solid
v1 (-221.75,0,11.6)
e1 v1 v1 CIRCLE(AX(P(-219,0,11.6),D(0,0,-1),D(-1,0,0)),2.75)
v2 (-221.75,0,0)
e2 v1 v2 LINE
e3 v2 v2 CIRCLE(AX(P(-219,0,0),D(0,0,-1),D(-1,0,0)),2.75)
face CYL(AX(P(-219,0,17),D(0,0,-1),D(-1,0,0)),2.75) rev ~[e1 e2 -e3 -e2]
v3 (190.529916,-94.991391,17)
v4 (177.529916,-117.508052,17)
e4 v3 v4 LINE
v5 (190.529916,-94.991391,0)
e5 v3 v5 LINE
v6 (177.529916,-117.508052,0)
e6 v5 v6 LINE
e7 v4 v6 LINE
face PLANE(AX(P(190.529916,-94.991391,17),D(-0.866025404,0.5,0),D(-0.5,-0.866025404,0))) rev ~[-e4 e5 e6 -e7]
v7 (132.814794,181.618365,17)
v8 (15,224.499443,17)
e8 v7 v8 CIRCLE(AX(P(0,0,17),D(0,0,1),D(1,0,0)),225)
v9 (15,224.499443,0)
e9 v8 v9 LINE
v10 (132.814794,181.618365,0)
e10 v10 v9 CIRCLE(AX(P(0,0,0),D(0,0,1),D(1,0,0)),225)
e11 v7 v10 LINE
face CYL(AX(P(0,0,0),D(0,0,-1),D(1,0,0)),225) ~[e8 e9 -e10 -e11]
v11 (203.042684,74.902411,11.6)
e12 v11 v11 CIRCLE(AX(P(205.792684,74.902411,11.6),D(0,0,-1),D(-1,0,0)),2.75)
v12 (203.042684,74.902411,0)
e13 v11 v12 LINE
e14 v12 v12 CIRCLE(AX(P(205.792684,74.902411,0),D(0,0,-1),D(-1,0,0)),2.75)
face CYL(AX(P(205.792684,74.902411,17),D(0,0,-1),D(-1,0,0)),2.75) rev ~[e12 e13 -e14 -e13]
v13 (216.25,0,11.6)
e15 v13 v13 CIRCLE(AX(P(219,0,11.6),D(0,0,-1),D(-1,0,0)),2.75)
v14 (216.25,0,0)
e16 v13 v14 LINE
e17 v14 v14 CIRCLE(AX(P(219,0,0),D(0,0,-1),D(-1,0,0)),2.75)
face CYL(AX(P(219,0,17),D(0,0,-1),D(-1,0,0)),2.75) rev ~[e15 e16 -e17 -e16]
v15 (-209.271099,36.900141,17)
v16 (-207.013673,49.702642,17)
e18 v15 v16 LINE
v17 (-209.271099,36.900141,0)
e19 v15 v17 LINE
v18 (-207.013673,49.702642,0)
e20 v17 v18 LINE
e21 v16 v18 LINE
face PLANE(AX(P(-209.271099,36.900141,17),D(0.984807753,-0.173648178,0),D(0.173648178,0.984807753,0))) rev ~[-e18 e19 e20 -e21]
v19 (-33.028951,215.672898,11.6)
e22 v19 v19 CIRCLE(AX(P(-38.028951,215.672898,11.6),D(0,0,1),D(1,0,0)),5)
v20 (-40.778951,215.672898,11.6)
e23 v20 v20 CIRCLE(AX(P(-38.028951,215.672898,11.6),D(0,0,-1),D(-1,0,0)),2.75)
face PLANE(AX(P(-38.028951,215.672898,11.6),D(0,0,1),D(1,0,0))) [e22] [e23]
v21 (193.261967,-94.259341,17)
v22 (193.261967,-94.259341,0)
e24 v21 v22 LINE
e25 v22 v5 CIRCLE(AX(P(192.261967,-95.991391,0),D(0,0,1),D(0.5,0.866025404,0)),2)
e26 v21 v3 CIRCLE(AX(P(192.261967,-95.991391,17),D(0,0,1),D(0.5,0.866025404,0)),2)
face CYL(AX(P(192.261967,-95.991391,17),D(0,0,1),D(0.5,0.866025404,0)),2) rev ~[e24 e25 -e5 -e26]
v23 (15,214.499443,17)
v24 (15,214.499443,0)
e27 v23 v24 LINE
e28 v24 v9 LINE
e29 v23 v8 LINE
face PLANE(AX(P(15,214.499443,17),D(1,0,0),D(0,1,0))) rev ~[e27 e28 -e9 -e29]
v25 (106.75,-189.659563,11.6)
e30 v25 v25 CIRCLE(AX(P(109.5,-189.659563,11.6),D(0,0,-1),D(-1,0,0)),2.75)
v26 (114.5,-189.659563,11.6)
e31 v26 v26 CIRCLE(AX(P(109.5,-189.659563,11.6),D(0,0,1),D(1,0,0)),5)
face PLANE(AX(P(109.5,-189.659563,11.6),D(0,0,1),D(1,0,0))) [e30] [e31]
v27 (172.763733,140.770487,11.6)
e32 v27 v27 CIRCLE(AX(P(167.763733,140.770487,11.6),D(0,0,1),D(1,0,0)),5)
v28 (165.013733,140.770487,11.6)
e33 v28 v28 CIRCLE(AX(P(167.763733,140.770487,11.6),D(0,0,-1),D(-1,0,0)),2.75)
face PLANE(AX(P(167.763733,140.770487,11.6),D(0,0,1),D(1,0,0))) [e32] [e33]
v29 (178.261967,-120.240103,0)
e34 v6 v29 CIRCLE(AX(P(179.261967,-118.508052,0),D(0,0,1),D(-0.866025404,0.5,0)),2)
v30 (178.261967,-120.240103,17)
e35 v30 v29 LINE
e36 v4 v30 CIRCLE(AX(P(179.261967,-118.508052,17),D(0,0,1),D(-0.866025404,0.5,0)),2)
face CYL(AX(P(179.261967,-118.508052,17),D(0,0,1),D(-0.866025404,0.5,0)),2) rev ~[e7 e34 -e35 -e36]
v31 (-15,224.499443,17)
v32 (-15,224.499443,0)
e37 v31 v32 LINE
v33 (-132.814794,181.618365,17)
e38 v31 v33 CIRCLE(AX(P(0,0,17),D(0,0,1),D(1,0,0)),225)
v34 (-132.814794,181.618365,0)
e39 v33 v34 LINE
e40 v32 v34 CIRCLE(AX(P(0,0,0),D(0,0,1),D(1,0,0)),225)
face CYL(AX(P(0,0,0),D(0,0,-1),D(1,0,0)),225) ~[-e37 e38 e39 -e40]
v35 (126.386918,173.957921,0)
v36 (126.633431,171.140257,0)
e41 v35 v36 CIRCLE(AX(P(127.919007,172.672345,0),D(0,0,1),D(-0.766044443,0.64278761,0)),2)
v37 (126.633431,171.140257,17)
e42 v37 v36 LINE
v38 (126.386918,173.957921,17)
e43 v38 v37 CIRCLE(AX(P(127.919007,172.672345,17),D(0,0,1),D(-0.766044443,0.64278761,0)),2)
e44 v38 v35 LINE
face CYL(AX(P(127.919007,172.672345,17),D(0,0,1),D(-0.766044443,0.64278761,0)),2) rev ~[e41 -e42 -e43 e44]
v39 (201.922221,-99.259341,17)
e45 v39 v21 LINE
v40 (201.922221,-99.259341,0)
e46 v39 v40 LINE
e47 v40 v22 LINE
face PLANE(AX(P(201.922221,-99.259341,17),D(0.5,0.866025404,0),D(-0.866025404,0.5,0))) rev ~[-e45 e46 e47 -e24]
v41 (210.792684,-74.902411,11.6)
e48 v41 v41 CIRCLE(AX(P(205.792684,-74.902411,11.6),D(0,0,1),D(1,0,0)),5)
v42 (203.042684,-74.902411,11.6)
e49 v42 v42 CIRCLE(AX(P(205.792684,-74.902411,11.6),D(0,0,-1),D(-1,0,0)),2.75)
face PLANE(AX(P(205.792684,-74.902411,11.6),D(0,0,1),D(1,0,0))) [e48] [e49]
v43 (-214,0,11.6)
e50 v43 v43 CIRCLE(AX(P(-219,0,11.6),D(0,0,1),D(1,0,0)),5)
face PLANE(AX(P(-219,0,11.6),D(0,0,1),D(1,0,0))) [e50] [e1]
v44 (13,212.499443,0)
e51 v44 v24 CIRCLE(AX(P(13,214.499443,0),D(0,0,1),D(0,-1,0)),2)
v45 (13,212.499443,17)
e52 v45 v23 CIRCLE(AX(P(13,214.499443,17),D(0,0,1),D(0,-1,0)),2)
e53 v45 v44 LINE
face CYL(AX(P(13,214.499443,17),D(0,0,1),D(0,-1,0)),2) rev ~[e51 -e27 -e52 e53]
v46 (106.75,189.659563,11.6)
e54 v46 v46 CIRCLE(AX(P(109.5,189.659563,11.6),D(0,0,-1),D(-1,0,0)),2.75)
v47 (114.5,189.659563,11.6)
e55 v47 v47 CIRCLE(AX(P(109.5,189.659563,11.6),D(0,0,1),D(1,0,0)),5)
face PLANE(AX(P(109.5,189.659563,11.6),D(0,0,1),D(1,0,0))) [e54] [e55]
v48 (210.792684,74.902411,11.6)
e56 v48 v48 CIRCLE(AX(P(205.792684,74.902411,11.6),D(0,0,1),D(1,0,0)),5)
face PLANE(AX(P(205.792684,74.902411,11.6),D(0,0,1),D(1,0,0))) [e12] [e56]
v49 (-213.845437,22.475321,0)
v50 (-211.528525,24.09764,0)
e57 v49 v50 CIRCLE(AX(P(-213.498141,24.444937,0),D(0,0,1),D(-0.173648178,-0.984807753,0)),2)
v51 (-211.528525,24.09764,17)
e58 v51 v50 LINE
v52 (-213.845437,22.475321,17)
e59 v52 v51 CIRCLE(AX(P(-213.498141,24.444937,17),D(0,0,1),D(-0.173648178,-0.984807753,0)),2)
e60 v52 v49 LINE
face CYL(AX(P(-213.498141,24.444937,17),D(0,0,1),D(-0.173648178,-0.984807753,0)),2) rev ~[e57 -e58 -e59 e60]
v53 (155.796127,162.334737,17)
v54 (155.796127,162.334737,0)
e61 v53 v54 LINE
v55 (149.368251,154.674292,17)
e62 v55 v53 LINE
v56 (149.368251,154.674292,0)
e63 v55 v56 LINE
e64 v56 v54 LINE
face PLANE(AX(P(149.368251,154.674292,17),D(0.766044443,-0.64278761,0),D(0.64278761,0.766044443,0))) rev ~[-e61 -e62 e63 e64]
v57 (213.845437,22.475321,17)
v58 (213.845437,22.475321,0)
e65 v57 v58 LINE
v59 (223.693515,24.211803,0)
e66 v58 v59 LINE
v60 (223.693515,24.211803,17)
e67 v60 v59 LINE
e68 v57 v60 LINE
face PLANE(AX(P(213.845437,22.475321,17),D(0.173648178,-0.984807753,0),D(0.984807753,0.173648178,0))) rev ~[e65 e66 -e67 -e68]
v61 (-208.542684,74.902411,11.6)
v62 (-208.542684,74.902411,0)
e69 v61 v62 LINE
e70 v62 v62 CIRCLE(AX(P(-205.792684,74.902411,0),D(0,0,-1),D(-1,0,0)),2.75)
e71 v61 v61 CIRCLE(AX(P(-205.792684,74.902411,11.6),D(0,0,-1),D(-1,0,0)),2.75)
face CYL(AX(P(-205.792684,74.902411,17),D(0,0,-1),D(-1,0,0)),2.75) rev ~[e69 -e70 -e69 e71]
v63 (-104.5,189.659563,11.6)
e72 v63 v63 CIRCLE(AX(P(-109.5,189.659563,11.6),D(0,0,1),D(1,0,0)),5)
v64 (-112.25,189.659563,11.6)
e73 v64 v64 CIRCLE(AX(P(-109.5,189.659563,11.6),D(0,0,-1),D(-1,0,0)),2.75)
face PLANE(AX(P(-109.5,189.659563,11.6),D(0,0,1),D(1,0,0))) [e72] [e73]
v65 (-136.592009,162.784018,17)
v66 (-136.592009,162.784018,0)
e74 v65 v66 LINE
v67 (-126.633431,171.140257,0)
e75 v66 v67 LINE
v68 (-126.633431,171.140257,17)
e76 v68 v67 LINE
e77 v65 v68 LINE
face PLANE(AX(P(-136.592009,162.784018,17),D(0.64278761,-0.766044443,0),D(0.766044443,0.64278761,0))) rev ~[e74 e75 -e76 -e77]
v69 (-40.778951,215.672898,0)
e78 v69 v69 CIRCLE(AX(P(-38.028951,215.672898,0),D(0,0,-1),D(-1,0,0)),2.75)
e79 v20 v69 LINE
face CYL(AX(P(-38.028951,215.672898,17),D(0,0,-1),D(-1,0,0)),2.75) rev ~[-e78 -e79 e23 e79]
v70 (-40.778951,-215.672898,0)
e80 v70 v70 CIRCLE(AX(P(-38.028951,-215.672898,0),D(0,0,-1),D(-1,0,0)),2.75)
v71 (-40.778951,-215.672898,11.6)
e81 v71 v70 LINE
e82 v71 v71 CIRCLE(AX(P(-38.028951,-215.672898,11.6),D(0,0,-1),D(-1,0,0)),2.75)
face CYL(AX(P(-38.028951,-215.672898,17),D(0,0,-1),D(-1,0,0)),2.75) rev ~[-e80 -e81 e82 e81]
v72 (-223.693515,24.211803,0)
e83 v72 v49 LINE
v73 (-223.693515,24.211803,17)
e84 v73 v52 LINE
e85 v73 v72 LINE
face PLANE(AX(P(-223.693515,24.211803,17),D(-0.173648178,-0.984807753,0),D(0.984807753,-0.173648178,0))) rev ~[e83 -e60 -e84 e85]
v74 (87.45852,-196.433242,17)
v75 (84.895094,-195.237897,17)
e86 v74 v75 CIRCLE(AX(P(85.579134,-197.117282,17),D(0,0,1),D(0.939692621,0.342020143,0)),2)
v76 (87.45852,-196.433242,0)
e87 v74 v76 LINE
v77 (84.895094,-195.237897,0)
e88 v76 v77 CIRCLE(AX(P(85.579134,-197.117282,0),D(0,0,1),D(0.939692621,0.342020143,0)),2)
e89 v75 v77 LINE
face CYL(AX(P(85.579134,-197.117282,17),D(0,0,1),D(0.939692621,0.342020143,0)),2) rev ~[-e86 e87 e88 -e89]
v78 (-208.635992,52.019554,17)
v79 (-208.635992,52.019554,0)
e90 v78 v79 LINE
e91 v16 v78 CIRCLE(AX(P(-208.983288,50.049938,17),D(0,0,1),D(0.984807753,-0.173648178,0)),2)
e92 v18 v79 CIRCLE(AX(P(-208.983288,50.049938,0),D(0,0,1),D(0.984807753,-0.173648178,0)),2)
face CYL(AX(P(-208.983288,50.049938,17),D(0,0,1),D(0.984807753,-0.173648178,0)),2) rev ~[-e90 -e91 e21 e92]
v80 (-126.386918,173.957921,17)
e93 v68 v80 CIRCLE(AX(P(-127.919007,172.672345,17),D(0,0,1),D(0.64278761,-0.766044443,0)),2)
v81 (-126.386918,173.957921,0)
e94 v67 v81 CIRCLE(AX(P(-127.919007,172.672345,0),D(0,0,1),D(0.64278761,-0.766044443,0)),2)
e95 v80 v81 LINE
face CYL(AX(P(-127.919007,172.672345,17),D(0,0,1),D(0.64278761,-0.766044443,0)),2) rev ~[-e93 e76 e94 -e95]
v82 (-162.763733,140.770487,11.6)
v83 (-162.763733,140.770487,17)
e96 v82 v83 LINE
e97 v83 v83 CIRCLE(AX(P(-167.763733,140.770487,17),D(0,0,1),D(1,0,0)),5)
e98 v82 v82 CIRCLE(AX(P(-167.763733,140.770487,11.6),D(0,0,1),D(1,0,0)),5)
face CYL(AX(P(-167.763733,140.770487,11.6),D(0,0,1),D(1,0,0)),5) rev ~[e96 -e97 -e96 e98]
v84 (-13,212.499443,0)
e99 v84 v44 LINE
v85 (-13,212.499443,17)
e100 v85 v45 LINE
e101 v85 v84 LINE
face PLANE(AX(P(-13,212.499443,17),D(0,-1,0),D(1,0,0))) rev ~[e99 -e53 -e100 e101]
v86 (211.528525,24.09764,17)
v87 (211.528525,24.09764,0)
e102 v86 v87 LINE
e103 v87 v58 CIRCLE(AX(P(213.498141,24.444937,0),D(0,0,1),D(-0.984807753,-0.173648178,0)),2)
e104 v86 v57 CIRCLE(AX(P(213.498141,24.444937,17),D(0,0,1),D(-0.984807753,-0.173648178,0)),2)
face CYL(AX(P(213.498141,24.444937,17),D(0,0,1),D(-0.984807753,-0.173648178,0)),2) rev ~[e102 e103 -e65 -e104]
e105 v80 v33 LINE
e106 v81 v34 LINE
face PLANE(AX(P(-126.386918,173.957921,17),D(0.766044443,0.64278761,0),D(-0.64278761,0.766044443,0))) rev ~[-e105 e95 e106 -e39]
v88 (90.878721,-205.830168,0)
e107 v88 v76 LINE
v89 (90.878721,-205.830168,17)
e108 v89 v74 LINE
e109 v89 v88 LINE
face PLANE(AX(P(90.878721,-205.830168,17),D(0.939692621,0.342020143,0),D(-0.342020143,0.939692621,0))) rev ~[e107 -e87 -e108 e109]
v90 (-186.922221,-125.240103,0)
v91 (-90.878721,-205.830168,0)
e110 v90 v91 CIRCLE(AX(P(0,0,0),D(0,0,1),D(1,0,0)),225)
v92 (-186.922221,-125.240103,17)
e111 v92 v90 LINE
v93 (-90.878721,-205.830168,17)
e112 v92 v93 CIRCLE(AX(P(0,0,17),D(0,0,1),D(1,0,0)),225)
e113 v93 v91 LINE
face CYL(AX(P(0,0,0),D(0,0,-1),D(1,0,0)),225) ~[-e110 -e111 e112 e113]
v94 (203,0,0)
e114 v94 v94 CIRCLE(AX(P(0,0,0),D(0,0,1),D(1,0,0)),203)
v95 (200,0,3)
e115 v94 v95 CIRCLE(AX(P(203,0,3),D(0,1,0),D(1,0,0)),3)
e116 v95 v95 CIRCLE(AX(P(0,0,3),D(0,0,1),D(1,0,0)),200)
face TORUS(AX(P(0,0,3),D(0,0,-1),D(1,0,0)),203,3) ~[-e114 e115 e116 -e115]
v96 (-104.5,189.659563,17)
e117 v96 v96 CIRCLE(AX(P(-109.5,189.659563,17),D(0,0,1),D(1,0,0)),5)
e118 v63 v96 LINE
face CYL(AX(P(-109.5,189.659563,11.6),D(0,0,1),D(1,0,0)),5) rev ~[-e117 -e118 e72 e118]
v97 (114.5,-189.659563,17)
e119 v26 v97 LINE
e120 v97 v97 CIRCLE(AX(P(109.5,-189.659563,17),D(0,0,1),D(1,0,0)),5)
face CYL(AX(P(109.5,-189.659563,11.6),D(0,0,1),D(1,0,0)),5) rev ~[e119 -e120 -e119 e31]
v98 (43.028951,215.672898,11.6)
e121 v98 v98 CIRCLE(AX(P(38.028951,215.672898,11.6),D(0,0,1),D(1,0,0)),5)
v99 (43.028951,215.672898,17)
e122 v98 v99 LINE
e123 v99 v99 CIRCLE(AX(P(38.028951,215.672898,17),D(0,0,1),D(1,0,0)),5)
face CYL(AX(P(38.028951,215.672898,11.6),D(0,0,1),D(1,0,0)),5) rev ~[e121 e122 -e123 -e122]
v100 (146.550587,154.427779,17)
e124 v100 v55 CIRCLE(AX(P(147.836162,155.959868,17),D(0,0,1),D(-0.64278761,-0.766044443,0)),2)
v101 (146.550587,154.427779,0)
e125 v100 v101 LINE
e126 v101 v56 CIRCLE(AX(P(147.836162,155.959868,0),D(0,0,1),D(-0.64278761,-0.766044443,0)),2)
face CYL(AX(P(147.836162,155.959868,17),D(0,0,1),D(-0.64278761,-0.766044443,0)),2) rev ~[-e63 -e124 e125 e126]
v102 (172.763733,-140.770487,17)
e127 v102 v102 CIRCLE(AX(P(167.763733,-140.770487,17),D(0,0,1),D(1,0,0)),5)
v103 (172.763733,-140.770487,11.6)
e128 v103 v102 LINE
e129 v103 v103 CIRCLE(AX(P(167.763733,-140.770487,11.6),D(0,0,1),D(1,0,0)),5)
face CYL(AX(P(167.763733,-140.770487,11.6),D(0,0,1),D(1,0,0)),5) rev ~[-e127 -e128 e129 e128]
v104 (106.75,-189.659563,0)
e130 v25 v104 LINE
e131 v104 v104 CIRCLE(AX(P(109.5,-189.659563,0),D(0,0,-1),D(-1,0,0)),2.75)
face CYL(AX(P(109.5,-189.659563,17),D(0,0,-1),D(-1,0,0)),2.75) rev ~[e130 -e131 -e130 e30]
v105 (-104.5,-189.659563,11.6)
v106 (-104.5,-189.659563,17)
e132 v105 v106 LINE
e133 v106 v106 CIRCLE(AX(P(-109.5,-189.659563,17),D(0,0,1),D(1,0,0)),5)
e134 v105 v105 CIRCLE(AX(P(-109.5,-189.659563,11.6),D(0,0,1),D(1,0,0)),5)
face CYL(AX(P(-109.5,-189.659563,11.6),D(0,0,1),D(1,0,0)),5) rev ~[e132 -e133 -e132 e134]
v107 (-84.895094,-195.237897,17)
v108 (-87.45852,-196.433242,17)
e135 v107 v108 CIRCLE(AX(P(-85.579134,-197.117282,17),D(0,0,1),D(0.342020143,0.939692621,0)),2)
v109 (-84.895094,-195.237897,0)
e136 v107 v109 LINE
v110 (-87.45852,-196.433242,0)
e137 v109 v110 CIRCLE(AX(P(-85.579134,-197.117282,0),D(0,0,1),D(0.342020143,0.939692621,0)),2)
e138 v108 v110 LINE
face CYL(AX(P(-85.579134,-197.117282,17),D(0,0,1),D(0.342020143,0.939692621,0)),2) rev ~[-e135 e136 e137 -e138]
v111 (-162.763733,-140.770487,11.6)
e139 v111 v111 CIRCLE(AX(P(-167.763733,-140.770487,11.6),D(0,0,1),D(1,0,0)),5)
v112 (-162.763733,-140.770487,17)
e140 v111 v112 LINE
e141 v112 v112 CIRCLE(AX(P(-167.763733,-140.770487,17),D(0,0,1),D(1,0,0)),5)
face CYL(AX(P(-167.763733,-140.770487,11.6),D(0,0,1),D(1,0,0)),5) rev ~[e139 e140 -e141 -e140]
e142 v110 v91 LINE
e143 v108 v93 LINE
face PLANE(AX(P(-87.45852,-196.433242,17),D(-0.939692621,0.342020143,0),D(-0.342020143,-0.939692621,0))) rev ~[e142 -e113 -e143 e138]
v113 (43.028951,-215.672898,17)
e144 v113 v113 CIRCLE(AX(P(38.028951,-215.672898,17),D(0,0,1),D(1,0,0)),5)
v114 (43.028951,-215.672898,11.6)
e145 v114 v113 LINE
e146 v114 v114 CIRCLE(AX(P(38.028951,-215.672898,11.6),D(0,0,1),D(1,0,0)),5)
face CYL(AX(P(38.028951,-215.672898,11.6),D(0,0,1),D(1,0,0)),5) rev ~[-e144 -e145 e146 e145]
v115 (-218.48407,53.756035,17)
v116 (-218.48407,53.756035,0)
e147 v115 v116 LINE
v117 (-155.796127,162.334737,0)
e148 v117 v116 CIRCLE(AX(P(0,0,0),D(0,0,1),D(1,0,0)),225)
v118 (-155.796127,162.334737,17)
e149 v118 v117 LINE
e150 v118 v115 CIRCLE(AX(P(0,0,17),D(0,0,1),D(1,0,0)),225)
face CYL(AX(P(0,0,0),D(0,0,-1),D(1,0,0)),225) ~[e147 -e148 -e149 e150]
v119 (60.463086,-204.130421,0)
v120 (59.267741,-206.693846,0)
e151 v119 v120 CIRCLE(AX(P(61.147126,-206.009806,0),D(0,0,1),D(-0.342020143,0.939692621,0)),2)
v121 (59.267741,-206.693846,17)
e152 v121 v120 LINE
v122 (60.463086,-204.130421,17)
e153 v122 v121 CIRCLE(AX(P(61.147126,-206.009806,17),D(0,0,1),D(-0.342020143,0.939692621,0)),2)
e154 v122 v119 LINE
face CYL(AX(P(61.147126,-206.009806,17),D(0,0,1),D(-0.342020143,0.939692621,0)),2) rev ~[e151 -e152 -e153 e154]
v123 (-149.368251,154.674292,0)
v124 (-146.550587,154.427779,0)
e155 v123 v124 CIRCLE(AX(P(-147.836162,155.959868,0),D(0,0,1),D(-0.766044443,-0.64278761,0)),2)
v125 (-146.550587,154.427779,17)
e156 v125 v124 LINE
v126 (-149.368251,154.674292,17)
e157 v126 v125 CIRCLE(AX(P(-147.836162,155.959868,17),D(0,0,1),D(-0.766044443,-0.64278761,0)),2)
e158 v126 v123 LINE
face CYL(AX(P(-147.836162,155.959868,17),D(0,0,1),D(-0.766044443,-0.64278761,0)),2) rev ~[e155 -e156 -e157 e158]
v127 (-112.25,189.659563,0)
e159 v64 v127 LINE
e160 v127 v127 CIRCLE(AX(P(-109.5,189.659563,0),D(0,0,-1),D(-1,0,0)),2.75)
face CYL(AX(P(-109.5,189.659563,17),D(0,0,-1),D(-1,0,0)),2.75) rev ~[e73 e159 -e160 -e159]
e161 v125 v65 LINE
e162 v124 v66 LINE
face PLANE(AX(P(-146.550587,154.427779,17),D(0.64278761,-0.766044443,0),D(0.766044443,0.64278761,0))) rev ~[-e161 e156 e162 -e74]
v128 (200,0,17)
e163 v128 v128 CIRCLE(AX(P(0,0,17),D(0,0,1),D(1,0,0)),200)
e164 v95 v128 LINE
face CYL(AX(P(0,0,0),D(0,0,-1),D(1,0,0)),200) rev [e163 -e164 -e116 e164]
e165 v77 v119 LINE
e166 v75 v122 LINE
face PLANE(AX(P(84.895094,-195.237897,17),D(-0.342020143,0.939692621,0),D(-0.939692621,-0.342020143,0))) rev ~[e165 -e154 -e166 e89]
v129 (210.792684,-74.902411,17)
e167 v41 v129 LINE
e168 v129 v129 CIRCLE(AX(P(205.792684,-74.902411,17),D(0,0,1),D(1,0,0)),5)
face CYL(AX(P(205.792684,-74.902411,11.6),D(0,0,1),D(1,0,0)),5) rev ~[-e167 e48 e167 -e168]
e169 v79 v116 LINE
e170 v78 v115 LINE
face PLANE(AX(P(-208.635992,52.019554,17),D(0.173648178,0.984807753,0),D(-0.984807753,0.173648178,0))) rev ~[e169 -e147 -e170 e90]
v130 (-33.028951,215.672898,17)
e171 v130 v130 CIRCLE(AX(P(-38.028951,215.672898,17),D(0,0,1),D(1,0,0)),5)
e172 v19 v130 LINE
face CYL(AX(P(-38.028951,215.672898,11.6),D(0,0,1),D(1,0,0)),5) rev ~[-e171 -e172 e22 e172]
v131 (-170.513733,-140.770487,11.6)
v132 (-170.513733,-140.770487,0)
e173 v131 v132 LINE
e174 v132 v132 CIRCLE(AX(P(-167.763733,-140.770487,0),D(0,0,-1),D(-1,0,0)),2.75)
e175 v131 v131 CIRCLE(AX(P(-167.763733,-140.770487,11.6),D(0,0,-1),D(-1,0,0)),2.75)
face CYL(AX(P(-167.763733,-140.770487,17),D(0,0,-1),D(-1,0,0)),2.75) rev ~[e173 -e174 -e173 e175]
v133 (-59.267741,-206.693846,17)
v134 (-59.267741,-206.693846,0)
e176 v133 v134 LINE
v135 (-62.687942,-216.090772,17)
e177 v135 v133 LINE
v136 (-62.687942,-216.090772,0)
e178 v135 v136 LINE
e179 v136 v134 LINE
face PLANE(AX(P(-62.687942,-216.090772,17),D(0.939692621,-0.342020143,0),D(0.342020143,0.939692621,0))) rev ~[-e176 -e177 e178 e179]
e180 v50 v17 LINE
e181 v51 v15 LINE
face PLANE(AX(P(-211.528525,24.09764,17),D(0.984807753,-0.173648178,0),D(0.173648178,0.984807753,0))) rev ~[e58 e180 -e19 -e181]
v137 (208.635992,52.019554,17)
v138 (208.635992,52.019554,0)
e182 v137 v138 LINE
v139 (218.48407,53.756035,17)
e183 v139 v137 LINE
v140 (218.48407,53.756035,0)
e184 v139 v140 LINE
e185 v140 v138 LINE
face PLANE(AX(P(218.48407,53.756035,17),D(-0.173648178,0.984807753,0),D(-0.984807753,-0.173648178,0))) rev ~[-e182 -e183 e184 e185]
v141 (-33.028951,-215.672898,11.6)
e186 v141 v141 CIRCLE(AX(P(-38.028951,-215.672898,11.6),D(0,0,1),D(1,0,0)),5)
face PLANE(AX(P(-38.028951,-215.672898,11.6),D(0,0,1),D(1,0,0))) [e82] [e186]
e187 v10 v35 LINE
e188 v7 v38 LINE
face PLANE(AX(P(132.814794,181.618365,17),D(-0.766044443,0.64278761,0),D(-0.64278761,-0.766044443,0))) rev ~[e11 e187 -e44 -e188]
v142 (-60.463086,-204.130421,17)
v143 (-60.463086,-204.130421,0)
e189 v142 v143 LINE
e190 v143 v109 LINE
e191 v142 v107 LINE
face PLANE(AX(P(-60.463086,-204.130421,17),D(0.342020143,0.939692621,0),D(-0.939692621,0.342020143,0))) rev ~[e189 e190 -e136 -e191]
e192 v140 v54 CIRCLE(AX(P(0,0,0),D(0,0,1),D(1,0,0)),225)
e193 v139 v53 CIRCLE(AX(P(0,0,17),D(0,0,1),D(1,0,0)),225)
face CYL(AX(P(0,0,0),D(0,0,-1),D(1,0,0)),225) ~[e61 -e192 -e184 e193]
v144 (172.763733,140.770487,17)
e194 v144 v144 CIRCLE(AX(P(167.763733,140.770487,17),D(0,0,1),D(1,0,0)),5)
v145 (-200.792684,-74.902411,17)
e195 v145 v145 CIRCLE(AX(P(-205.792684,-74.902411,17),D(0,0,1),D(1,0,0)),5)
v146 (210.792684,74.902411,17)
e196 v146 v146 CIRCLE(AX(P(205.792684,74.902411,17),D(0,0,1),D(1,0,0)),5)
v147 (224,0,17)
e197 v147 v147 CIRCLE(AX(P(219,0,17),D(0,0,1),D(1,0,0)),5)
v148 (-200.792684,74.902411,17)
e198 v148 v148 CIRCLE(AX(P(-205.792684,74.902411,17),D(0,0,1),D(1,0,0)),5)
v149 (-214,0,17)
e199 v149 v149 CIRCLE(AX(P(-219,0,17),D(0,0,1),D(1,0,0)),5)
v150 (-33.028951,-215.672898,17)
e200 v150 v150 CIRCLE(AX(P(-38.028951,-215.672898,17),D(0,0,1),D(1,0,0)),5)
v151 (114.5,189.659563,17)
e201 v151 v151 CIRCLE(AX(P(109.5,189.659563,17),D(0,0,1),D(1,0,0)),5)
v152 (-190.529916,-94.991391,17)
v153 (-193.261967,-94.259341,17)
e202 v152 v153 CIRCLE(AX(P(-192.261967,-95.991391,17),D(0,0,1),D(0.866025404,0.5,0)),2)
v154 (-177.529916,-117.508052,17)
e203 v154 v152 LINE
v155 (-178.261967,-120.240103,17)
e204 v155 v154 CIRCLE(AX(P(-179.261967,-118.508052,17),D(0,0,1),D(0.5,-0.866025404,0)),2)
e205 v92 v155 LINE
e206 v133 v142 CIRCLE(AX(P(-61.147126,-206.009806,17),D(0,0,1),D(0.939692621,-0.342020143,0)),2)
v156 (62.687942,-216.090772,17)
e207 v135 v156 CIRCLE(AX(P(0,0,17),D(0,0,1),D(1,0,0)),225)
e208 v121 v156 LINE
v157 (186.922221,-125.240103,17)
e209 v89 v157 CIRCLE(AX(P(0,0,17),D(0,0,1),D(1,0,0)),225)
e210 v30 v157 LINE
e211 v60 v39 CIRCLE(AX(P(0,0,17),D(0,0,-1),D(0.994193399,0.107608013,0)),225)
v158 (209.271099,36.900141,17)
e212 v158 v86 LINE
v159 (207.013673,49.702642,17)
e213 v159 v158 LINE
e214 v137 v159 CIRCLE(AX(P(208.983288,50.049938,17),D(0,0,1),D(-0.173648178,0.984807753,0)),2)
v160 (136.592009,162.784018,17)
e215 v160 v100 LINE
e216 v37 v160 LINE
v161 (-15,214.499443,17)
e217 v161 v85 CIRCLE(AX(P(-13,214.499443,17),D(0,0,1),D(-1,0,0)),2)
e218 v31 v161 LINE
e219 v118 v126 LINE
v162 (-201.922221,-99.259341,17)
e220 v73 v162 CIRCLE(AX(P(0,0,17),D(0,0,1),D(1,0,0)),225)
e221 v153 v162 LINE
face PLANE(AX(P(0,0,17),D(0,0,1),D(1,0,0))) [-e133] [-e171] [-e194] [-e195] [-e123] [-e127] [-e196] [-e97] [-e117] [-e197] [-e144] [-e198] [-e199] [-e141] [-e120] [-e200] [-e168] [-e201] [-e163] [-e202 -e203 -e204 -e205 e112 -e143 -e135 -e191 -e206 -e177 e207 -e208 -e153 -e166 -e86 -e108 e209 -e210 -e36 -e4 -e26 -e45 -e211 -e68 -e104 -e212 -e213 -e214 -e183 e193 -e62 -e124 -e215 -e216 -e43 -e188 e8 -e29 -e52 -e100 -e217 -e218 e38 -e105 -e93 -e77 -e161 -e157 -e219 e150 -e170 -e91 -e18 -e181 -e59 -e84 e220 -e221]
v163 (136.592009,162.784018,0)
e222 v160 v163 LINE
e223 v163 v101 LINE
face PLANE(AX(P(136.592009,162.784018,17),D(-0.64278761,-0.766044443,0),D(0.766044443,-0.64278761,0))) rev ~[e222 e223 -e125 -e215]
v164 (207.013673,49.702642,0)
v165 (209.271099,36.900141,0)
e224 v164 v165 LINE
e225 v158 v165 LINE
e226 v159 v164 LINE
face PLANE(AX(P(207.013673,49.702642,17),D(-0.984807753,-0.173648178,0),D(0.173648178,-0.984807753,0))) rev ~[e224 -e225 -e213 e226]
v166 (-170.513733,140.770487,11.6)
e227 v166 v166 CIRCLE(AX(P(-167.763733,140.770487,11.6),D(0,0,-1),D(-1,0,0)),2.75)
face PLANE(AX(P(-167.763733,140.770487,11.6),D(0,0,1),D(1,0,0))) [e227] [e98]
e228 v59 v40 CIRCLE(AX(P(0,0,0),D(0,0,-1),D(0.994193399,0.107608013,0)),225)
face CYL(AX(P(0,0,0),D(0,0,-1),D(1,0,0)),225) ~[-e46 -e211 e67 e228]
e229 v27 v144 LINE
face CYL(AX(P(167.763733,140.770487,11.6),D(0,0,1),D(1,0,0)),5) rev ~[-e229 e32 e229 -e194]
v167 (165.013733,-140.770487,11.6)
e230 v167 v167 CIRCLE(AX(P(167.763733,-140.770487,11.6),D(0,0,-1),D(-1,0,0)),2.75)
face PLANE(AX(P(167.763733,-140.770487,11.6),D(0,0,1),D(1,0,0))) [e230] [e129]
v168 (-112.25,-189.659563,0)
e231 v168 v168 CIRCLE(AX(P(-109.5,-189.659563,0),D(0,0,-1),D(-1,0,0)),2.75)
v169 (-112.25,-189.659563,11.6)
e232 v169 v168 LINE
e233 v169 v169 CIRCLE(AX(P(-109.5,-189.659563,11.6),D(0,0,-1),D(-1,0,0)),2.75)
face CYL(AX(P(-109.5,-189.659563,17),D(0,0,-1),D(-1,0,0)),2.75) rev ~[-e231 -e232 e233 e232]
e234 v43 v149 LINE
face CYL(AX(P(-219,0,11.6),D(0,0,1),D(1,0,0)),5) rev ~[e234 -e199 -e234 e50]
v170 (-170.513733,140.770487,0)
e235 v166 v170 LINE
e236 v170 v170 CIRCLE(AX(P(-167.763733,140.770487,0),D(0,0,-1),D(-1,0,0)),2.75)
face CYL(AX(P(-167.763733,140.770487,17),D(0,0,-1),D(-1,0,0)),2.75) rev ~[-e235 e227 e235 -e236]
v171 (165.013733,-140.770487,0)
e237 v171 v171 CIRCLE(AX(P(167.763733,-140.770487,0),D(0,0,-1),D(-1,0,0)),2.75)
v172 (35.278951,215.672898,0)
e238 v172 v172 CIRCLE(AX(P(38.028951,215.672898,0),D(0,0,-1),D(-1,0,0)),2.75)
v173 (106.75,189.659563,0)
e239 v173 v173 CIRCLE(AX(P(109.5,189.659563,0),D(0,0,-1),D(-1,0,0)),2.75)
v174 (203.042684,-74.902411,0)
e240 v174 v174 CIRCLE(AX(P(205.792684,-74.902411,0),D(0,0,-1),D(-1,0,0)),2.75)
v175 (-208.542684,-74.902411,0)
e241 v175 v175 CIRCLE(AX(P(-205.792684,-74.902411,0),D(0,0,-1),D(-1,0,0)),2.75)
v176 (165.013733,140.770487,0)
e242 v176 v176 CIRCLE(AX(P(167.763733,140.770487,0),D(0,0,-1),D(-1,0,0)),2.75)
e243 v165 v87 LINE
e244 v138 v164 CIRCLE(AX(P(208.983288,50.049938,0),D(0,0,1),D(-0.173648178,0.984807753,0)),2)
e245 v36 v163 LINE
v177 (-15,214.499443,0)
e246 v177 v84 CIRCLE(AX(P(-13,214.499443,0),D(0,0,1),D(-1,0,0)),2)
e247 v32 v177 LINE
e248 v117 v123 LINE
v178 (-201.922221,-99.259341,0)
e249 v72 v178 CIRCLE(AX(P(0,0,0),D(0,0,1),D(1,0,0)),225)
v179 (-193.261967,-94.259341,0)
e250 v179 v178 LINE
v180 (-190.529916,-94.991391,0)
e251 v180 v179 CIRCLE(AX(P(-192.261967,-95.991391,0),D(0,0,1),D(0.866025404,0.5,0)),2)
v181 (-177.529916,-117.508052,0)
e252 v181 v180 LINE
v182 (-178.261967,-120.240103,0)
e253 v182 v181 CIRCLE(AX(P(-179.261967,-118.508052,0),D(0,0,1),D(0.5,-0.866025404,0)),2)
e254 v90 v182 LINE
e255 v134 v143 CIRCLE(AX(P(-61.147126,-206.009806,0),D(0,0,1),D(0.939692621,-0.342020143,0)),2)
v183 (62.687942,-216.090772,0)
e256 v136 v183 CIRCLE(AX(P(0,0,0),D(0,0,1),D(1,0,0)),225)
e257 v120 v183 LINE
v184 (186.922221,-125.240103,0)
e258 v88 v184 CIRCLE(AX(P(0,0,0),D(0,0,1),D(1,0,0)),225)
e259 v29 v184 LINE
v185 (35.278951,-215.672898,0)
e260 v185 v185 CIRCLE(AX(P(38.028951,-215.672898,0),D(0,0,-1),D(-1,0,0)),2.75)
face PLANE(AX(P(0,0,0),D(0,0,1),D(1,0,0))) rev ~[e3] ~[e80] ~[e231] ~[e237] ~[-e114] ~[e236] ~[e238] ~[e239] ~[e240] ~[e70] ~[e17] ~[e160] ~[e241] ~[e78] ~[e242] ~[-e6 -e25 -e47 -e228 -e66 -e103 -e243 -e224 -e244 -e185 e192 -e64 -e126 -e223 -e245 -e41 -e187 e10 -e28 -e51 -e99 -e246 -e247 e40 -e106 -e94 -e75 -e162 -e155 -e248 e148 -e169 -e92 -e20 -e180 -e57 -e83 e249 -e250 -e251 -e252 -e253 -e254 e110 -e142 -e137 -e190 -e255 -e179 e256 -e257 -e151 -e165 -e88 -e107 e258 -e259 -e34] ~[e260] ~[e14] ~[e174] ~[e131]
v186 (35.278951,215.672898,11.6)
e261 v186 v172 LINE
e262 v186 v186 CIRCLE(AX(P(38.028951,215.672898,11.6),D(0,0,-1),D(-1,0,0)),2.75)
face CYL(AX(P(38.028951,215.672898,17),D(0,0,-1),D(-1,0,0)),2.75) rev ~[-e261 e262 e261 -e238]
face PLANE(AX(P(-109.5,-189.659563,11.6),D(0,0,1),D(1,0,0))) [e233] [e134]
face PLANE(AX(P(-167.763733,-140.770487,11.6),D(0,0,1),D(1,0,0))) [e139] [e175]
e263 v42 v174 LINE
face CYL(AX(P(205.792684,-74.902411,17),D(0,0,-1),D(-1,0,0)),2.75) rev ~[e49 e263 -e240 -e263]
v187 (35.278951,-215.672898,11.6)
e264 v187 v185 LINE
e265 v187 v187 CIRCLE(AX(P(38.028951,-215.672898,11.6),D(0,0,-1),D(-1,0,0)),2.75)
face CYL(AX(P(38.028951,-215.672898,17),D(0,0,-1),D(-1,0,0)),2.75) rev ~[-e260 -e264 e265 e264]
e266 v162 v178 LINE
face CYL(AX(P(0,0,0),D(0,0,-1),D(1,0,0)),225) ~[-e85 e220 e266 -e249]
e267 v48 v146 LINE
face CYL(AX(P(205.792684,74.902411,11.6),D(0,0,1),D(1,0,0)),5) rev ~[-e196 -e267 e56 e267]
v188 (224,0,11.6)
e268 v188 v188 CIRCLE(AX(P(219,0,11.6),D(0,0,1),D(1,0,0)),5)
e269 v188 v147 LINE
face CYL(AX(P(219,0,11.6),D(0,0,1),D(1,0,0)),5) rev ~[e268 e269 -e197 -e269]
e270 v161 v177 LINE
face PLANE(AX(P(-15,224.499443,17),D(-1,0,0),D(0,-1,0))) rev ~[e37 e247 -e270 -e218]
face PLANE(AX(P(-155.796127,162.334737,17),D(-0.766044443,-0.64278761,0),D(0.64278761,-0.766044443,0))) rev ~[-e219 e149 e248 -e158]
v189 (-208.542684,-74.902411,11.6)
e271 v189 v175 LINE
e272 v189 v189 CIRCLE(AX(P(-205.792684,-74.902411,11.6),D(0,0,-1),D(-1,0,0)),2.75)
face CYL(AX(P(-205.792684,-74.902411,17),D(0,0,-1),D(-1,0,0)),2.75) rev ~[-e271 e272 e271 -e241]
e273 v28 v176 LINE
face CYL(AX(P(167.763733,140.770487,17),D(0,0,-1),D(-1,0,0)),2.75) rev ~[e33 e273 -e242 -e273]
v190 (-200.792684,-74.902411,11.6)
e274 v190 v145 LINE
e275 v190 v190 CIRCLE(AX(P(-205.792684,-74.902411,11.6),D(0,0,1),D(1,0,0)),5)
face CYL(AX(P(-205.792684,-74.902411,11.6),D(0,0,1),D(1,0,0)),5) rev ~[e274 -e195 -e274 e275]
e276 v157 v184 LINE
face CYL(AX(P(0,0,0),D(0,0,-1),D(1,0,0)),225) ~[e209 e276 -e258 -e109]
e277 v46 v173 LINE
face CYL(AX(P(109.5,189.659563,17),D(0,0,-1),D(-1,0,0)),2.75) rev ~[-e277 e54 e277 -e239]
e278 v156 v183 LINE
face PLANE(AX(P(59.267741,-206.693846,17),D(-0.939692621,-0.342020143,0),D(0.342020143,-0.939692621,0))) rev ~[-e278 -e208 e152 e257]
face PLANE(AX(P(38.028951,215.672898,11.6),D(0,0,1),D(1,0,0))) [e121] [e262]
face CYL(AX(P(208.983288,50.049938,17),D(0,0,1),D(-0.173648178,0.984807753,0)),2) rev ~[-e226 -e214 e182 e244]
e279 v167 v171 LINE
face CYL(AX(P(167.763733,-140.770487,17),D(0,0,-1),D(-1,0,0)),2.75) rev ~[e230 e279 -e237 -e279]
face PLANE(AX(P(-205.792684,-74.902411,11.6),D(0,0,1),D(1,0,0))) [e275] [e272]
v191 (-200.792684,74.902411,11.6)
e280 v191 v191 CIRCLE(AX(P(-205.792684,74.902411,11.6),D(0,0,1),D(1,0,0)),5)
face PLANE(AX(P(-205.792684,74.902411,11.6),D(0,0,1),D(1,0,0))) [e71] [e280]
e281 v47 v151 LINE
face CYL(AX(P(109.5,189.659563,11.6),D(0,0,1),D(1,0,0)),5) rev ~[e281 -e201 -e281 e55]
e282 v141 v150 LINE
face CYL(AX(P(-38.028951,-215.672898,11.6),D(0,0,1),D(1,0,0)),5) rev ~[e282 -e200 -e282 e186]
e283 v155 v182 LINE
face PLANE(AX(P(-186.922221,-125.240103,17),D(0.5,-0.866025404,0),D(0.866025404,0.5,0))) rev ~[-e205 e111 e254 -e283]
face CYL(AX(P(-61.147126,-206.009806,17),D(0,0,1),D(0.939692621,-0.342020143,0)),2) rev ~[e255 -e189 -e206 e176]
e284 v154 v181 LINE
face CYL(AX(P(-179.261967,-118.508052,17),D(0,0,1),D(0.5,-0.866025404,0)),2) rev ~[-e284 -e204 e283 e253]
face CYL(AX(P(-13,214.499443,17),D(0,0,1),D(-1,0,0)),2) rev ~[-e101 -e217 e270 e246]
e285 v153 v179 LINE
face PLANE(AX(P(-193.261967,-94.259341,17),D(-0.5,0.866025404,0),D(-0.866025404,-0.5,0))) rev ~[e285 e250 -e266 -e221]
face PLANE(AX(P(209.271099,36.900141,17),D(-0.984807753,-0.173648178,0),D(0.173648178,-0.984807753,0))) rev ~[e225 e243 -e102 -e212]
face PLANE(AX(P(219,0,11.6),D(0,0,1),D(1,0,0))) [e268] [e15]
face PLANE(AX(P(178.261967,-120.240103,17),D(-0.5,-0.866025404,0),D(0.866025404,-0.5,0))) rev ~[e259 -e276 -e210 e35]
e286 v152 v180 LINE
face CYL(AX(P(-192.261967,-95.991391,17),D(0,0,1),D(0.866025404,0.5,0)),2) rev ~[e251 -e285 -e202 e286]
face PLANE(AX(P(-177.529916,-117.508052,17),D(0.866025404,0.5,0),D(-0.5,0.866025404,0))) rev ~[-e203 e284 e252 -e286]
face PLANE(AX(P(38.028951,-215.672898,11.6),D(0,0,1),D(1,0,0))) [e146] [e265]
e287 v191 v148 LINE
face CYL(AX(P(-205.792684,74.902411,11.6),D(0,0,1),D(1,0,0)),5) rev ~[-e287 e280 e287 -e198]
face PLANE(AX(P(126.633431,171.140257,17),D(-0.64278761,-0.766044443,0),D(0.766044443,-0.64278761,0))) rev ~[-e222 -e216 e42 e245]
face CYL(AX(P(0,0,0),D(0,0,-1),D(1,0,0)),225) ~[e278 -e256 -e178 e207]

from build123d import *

# Parameters (mm, degrees)
F0_R           = 225
F0_R_2         = 200
F1_DEPTH       = 17
F3_D           = 5.5
F3_CBORE_D     = 10
F3_CBORE_DEPTH = 5.4
F4_R           = 3
F6_DEPTH       = 17.001


# Not quite as in the source:
# - a feature names something its author has since deleted; it is built from what else it names


with BuildPart() as f1:
    # F0 (on Top) → F1 (new body)
    with BuildSketch(Plane.XY):
        Circle(F0_R)
        Circle(F0_R_2, mode=Mode.SUBTRACT)
    extrude(amount=F1_DEPTH)

    # F3 (through all)
    with Locations(Plane.XY.offset(17)):
        with Locations((219, 0), (205.7926839521, 74.9024113883), (167.7637330431, 140.7704865214), (109.5, 189.6595634288), (38.0289509091, 215.6728979097), (-38.0289509091, 215.6728979097), (-109.5, 189.6595634288), (-167.7637330431, 140.7704865214), (-205.7926839521, 74.9024113883), (-219, 0), (-205.7926839521, -74.9024113883), (-167.7637330431, -140.7704865214), (-109.5, -189.6595634288), (-38.0289509091, -215.6728979097), (38.0289509091, -215.6728979097), (109.5, -189.6595634288), (167.7637330431, -140.7704865214), (205.7926839521, -74.9024113883)):
            CounterBoreHole(F3_D / 2, F3_CBORE_D / 2, F3_CBORE_DEPTH)

    # F4
    f4_edges = [f1.edges().sort_by_distance(p)[0] for p in [
        (-200, 0, 0),
    ]]
    fillet(f4_edges, radius=F4_R)

    # F5 (on face) → F6 (cut, through all)
    with BuildSketch(Plane.XY.offset(17)):
        with BuildLine():
            ThreePointArc((223.6935148816, 24.2118029049), (221.5817444277, 39.0708399751), (218.4840695516, 53.7560354952))
            Line((218.4840695516, 53.7560354952), (208.6359920215, 52.0195537186))
            ThreePointArc((208.6359920215, 52.0195537186), (207.3449842883, 51.1970910852), (207.0136728708, 49.7026418572))
            Line((207.0136728708, 49.7026418572), (209.2710991805, 36.900141068))
            Line((209.2710991805, 36.900141068), (211.5285254901, 24.0976402789))
            ThreePointArc((211.5285254901, 24.0976402789), (212.3509881235, 22.8066325456), (213.8454373515, 22.4753211282))
            Line((213.8454373515, 22.4753211282), (223.6935148816, 24.2118029049))
        make_face()
        with BuildLine():
            Line((149.3682510245, 154.6742923751), (155.7961271214, 162.3347368063))
            ThreePointArc((155.7961271214, 162.3347368063), (144.6272121795, 172.3599997018), (132.8147938278, 181.6183650969))
            Line((132.8147938278, 181.6183650969), (126.386917731, 173.9579206657))
            ThreePointArc((126.386917731, 173.9579206657), (125.926617221, 172.4980339608), (126.6334313978, 171.1402565601))
            Line((126.6334313978, 171.1402565601), (136.5920091584, 162.7840176342))
            Line((136.5920091584, 162.7840176342), (146.5505869189, 154.4277787082))
            ThreePointArc((146.5505869189, 154.4277787082), (148.0104736238, 153.9674781983), (149.3682510245, 154.6742923751))
        make_face()
        with BuildLine():
            Line((15, 214.4994432064), (15, 224.4994432064))
            ThreePointArc((15, 224.4994432064), (0, 225), (-15, 224.4994432064))
            Line((-15, 224.4994432064), (-15, 214.4994432064))
            ThreePointArc((-15, 214.4994432064), (-14.4142135624, 213.0852296441), (-13, 212.4994432064))
            Line((-13, 212.4994432064), (0, 212.4994432064))
            Line((0, 212.4994432064), (13, 212.4994432064))
            ThreePointArc((13, 212.4994432064), (14.4142135624, 213.0852296441), (15, 214.4994432064))
        make_face()
        with BuildLine():
            Line((-126.386917731, 173.9579206657), (-132.8147938278, 181.6183650969))
            ThreePointArc((-132.8147938278, 181.6183650969), (-144.6272121795, 172.3599997018), (-155.7961271214, 162.3347368063))
            Line((-155.7961271214, 162.3347368063), (-149.3682510245, 154.6742923751))
            ThreePointArc((-149.3682510245, 154.6742923751), (-148.0104736238, 153.9674781983), (-146.5505869189, 154.4277787082))
            Line((-146.5505869189, 154.4277787082), (-136.5920091584, 162.7840176342))
            Line((-136.5920091584, 162.7840176342), (-126.6334313978, 171.1402565601))
            ThreePointArc((-126.6334313978, 171.1402565601), (-125.926617221, 172.4980339608), (-126.386917731, 173.9579206657))
        make_face()
        with BuildLine():
            Line((-208.6359920215, 52.0195537186), (-218.4840695516, 53.7560354952))
            ThreePointArc((-218.4840695516, 53.7560354952), (-221.5817444277, 39.0708399751), (-223.6935148816, 24.2118029049))
            Line((-223.6935148816, 24.2118029049), (-213.8454373515, 22.4753211282))
            ThreePointArc((-213.8454373515, 22.4753211282), (-212.3509881235, 22.8066325456), (-211.5285254901, 24.0976402789))
            Line((-211.5285254901, 24.0976402789), (-209.2710991805, 36.900141068))
            Line((-209.2710991805, 36.900141068), (-207.0136728708, 49.7026418572))
            ThreePointArc((-207.0136728708, 49.7026418572), (-207.3449842883, 51.1970910852), (-208.6359920215, 52.0195537186))
        make_face()
        with BuildLine():
            ThreePointArc((-201.9222209522, -99.2593405465), (-194.8557158515, -112.5), (-186.9222209522, -125.24010266))
            Line((-186.9222209522, -125.24010266), (-178.2619669144, -120.24010266))
            ThreePointArc((-178.2619669144, -120.24010266), (-177.3301152618, -119.0256899426), (-177.5299161068, -117.5080518524))
            Line((-177.5299161068, -117.5080518524), (-184.0299161068, -106.2497216032))
            Line((-184.0299161068, -106.2497216032), (-190.5299161068, -94.991391354))
            ThreePointArc((-190.5299161068, -94.991391354), (-191.7443288242, -94.0595397014), (-193.2619669144, -94.2593405465))
            Line((-193.2619669144, -94.2593405465), (-201.9222209522, -99.2593405465))
        make_face()
        with BuildLine():
            ThreePointArc((-90.8787210538, -205.8301680017), (-76.9545322483, -211.4308396768), (-62.6879424302, -216.0907723015))
            Line((-62.6879424302, -216.0907723015), (-59.267740997, -206.6938460937))
            ThreePointArc((-59.267740997, -206.6938460937), (-59.3345106645, -205.1645692835), (-60.4630859519, -204.1304205654))
            Line((-60.4630859519, -204.1304205654), (-72.6790900221, -199.6841587022))
            Line((-72.6790900221, -199.6841587022), (-84.8950940923, -195.237896839))
            ThreePointArc((-84.8950940923, -195.237896839), (-86.4243709024, -195.3046665065), (-87.4585196205, -196.4332417939))
            Line((-87.4585196205, -196.4332417939), (-90.8787210538, -205.8301680017))
        make_face()
        with BuildLine():
            ThreePointArc((62.6879424302, -216.0907723015), (76.9545322483, -211.4308396768), (90.8787210538, -205.8301680017))
            Line((90.8787210538, -205.8301680017), (87.4585196205, -196.4332417939))
            ThreePointArc((87.4585196205, -196.4332417939), (86.4243709024, -195.3046665065), (84.8950940923, -195.237896839))
            Line((84.8950940923, -195.237896839), (72.6790900221, -199.6841587022))
            Line((72.6790900221, -199.6841587022), (60.4630859519, -204.1304205654))
            ThreePointArc((60.4630859519, -204.1304205654), (59.3345106645, -205.1645692835), (59.267740997, -206.6938460937))
            Line((59.267740997, -206.6938460937), (62.6879424302, -216.0907723015))
        make_face()
        with BuildLine():
            ThreePointArc((186.9222209522, -125.24010266), (194.8557158515, -112.5), (201.9222209522, -99.2593405465))
            Line((201.9222209522, -99.2593405465), (193.2619669144, -94.2593405465))
            ThreePointArc((193.2619669144, -94.2593405465), (191.7443288242, -94.0595397014), (190.5299161068, -94.991391354))
            Line((190.5299161068, -94.991391354), (184.0299161068, -106.2497216032))
            Line((184.0299161068, -106.2497216032), (177.5299161068, -117.5080518524))
            ThreePointArc((177.5299161068, -117.5080518524), (177.3301152618, -119.0256899426), (178.2619669144, -120.24010266))
            Line((178.2619669144, -120.24010266), (186.9222209522, -125.24010266))
        make_face()
    extrude(amount=-F6_DEPTH, mode=Mode.SUBTRACT)


solid = f1.part
